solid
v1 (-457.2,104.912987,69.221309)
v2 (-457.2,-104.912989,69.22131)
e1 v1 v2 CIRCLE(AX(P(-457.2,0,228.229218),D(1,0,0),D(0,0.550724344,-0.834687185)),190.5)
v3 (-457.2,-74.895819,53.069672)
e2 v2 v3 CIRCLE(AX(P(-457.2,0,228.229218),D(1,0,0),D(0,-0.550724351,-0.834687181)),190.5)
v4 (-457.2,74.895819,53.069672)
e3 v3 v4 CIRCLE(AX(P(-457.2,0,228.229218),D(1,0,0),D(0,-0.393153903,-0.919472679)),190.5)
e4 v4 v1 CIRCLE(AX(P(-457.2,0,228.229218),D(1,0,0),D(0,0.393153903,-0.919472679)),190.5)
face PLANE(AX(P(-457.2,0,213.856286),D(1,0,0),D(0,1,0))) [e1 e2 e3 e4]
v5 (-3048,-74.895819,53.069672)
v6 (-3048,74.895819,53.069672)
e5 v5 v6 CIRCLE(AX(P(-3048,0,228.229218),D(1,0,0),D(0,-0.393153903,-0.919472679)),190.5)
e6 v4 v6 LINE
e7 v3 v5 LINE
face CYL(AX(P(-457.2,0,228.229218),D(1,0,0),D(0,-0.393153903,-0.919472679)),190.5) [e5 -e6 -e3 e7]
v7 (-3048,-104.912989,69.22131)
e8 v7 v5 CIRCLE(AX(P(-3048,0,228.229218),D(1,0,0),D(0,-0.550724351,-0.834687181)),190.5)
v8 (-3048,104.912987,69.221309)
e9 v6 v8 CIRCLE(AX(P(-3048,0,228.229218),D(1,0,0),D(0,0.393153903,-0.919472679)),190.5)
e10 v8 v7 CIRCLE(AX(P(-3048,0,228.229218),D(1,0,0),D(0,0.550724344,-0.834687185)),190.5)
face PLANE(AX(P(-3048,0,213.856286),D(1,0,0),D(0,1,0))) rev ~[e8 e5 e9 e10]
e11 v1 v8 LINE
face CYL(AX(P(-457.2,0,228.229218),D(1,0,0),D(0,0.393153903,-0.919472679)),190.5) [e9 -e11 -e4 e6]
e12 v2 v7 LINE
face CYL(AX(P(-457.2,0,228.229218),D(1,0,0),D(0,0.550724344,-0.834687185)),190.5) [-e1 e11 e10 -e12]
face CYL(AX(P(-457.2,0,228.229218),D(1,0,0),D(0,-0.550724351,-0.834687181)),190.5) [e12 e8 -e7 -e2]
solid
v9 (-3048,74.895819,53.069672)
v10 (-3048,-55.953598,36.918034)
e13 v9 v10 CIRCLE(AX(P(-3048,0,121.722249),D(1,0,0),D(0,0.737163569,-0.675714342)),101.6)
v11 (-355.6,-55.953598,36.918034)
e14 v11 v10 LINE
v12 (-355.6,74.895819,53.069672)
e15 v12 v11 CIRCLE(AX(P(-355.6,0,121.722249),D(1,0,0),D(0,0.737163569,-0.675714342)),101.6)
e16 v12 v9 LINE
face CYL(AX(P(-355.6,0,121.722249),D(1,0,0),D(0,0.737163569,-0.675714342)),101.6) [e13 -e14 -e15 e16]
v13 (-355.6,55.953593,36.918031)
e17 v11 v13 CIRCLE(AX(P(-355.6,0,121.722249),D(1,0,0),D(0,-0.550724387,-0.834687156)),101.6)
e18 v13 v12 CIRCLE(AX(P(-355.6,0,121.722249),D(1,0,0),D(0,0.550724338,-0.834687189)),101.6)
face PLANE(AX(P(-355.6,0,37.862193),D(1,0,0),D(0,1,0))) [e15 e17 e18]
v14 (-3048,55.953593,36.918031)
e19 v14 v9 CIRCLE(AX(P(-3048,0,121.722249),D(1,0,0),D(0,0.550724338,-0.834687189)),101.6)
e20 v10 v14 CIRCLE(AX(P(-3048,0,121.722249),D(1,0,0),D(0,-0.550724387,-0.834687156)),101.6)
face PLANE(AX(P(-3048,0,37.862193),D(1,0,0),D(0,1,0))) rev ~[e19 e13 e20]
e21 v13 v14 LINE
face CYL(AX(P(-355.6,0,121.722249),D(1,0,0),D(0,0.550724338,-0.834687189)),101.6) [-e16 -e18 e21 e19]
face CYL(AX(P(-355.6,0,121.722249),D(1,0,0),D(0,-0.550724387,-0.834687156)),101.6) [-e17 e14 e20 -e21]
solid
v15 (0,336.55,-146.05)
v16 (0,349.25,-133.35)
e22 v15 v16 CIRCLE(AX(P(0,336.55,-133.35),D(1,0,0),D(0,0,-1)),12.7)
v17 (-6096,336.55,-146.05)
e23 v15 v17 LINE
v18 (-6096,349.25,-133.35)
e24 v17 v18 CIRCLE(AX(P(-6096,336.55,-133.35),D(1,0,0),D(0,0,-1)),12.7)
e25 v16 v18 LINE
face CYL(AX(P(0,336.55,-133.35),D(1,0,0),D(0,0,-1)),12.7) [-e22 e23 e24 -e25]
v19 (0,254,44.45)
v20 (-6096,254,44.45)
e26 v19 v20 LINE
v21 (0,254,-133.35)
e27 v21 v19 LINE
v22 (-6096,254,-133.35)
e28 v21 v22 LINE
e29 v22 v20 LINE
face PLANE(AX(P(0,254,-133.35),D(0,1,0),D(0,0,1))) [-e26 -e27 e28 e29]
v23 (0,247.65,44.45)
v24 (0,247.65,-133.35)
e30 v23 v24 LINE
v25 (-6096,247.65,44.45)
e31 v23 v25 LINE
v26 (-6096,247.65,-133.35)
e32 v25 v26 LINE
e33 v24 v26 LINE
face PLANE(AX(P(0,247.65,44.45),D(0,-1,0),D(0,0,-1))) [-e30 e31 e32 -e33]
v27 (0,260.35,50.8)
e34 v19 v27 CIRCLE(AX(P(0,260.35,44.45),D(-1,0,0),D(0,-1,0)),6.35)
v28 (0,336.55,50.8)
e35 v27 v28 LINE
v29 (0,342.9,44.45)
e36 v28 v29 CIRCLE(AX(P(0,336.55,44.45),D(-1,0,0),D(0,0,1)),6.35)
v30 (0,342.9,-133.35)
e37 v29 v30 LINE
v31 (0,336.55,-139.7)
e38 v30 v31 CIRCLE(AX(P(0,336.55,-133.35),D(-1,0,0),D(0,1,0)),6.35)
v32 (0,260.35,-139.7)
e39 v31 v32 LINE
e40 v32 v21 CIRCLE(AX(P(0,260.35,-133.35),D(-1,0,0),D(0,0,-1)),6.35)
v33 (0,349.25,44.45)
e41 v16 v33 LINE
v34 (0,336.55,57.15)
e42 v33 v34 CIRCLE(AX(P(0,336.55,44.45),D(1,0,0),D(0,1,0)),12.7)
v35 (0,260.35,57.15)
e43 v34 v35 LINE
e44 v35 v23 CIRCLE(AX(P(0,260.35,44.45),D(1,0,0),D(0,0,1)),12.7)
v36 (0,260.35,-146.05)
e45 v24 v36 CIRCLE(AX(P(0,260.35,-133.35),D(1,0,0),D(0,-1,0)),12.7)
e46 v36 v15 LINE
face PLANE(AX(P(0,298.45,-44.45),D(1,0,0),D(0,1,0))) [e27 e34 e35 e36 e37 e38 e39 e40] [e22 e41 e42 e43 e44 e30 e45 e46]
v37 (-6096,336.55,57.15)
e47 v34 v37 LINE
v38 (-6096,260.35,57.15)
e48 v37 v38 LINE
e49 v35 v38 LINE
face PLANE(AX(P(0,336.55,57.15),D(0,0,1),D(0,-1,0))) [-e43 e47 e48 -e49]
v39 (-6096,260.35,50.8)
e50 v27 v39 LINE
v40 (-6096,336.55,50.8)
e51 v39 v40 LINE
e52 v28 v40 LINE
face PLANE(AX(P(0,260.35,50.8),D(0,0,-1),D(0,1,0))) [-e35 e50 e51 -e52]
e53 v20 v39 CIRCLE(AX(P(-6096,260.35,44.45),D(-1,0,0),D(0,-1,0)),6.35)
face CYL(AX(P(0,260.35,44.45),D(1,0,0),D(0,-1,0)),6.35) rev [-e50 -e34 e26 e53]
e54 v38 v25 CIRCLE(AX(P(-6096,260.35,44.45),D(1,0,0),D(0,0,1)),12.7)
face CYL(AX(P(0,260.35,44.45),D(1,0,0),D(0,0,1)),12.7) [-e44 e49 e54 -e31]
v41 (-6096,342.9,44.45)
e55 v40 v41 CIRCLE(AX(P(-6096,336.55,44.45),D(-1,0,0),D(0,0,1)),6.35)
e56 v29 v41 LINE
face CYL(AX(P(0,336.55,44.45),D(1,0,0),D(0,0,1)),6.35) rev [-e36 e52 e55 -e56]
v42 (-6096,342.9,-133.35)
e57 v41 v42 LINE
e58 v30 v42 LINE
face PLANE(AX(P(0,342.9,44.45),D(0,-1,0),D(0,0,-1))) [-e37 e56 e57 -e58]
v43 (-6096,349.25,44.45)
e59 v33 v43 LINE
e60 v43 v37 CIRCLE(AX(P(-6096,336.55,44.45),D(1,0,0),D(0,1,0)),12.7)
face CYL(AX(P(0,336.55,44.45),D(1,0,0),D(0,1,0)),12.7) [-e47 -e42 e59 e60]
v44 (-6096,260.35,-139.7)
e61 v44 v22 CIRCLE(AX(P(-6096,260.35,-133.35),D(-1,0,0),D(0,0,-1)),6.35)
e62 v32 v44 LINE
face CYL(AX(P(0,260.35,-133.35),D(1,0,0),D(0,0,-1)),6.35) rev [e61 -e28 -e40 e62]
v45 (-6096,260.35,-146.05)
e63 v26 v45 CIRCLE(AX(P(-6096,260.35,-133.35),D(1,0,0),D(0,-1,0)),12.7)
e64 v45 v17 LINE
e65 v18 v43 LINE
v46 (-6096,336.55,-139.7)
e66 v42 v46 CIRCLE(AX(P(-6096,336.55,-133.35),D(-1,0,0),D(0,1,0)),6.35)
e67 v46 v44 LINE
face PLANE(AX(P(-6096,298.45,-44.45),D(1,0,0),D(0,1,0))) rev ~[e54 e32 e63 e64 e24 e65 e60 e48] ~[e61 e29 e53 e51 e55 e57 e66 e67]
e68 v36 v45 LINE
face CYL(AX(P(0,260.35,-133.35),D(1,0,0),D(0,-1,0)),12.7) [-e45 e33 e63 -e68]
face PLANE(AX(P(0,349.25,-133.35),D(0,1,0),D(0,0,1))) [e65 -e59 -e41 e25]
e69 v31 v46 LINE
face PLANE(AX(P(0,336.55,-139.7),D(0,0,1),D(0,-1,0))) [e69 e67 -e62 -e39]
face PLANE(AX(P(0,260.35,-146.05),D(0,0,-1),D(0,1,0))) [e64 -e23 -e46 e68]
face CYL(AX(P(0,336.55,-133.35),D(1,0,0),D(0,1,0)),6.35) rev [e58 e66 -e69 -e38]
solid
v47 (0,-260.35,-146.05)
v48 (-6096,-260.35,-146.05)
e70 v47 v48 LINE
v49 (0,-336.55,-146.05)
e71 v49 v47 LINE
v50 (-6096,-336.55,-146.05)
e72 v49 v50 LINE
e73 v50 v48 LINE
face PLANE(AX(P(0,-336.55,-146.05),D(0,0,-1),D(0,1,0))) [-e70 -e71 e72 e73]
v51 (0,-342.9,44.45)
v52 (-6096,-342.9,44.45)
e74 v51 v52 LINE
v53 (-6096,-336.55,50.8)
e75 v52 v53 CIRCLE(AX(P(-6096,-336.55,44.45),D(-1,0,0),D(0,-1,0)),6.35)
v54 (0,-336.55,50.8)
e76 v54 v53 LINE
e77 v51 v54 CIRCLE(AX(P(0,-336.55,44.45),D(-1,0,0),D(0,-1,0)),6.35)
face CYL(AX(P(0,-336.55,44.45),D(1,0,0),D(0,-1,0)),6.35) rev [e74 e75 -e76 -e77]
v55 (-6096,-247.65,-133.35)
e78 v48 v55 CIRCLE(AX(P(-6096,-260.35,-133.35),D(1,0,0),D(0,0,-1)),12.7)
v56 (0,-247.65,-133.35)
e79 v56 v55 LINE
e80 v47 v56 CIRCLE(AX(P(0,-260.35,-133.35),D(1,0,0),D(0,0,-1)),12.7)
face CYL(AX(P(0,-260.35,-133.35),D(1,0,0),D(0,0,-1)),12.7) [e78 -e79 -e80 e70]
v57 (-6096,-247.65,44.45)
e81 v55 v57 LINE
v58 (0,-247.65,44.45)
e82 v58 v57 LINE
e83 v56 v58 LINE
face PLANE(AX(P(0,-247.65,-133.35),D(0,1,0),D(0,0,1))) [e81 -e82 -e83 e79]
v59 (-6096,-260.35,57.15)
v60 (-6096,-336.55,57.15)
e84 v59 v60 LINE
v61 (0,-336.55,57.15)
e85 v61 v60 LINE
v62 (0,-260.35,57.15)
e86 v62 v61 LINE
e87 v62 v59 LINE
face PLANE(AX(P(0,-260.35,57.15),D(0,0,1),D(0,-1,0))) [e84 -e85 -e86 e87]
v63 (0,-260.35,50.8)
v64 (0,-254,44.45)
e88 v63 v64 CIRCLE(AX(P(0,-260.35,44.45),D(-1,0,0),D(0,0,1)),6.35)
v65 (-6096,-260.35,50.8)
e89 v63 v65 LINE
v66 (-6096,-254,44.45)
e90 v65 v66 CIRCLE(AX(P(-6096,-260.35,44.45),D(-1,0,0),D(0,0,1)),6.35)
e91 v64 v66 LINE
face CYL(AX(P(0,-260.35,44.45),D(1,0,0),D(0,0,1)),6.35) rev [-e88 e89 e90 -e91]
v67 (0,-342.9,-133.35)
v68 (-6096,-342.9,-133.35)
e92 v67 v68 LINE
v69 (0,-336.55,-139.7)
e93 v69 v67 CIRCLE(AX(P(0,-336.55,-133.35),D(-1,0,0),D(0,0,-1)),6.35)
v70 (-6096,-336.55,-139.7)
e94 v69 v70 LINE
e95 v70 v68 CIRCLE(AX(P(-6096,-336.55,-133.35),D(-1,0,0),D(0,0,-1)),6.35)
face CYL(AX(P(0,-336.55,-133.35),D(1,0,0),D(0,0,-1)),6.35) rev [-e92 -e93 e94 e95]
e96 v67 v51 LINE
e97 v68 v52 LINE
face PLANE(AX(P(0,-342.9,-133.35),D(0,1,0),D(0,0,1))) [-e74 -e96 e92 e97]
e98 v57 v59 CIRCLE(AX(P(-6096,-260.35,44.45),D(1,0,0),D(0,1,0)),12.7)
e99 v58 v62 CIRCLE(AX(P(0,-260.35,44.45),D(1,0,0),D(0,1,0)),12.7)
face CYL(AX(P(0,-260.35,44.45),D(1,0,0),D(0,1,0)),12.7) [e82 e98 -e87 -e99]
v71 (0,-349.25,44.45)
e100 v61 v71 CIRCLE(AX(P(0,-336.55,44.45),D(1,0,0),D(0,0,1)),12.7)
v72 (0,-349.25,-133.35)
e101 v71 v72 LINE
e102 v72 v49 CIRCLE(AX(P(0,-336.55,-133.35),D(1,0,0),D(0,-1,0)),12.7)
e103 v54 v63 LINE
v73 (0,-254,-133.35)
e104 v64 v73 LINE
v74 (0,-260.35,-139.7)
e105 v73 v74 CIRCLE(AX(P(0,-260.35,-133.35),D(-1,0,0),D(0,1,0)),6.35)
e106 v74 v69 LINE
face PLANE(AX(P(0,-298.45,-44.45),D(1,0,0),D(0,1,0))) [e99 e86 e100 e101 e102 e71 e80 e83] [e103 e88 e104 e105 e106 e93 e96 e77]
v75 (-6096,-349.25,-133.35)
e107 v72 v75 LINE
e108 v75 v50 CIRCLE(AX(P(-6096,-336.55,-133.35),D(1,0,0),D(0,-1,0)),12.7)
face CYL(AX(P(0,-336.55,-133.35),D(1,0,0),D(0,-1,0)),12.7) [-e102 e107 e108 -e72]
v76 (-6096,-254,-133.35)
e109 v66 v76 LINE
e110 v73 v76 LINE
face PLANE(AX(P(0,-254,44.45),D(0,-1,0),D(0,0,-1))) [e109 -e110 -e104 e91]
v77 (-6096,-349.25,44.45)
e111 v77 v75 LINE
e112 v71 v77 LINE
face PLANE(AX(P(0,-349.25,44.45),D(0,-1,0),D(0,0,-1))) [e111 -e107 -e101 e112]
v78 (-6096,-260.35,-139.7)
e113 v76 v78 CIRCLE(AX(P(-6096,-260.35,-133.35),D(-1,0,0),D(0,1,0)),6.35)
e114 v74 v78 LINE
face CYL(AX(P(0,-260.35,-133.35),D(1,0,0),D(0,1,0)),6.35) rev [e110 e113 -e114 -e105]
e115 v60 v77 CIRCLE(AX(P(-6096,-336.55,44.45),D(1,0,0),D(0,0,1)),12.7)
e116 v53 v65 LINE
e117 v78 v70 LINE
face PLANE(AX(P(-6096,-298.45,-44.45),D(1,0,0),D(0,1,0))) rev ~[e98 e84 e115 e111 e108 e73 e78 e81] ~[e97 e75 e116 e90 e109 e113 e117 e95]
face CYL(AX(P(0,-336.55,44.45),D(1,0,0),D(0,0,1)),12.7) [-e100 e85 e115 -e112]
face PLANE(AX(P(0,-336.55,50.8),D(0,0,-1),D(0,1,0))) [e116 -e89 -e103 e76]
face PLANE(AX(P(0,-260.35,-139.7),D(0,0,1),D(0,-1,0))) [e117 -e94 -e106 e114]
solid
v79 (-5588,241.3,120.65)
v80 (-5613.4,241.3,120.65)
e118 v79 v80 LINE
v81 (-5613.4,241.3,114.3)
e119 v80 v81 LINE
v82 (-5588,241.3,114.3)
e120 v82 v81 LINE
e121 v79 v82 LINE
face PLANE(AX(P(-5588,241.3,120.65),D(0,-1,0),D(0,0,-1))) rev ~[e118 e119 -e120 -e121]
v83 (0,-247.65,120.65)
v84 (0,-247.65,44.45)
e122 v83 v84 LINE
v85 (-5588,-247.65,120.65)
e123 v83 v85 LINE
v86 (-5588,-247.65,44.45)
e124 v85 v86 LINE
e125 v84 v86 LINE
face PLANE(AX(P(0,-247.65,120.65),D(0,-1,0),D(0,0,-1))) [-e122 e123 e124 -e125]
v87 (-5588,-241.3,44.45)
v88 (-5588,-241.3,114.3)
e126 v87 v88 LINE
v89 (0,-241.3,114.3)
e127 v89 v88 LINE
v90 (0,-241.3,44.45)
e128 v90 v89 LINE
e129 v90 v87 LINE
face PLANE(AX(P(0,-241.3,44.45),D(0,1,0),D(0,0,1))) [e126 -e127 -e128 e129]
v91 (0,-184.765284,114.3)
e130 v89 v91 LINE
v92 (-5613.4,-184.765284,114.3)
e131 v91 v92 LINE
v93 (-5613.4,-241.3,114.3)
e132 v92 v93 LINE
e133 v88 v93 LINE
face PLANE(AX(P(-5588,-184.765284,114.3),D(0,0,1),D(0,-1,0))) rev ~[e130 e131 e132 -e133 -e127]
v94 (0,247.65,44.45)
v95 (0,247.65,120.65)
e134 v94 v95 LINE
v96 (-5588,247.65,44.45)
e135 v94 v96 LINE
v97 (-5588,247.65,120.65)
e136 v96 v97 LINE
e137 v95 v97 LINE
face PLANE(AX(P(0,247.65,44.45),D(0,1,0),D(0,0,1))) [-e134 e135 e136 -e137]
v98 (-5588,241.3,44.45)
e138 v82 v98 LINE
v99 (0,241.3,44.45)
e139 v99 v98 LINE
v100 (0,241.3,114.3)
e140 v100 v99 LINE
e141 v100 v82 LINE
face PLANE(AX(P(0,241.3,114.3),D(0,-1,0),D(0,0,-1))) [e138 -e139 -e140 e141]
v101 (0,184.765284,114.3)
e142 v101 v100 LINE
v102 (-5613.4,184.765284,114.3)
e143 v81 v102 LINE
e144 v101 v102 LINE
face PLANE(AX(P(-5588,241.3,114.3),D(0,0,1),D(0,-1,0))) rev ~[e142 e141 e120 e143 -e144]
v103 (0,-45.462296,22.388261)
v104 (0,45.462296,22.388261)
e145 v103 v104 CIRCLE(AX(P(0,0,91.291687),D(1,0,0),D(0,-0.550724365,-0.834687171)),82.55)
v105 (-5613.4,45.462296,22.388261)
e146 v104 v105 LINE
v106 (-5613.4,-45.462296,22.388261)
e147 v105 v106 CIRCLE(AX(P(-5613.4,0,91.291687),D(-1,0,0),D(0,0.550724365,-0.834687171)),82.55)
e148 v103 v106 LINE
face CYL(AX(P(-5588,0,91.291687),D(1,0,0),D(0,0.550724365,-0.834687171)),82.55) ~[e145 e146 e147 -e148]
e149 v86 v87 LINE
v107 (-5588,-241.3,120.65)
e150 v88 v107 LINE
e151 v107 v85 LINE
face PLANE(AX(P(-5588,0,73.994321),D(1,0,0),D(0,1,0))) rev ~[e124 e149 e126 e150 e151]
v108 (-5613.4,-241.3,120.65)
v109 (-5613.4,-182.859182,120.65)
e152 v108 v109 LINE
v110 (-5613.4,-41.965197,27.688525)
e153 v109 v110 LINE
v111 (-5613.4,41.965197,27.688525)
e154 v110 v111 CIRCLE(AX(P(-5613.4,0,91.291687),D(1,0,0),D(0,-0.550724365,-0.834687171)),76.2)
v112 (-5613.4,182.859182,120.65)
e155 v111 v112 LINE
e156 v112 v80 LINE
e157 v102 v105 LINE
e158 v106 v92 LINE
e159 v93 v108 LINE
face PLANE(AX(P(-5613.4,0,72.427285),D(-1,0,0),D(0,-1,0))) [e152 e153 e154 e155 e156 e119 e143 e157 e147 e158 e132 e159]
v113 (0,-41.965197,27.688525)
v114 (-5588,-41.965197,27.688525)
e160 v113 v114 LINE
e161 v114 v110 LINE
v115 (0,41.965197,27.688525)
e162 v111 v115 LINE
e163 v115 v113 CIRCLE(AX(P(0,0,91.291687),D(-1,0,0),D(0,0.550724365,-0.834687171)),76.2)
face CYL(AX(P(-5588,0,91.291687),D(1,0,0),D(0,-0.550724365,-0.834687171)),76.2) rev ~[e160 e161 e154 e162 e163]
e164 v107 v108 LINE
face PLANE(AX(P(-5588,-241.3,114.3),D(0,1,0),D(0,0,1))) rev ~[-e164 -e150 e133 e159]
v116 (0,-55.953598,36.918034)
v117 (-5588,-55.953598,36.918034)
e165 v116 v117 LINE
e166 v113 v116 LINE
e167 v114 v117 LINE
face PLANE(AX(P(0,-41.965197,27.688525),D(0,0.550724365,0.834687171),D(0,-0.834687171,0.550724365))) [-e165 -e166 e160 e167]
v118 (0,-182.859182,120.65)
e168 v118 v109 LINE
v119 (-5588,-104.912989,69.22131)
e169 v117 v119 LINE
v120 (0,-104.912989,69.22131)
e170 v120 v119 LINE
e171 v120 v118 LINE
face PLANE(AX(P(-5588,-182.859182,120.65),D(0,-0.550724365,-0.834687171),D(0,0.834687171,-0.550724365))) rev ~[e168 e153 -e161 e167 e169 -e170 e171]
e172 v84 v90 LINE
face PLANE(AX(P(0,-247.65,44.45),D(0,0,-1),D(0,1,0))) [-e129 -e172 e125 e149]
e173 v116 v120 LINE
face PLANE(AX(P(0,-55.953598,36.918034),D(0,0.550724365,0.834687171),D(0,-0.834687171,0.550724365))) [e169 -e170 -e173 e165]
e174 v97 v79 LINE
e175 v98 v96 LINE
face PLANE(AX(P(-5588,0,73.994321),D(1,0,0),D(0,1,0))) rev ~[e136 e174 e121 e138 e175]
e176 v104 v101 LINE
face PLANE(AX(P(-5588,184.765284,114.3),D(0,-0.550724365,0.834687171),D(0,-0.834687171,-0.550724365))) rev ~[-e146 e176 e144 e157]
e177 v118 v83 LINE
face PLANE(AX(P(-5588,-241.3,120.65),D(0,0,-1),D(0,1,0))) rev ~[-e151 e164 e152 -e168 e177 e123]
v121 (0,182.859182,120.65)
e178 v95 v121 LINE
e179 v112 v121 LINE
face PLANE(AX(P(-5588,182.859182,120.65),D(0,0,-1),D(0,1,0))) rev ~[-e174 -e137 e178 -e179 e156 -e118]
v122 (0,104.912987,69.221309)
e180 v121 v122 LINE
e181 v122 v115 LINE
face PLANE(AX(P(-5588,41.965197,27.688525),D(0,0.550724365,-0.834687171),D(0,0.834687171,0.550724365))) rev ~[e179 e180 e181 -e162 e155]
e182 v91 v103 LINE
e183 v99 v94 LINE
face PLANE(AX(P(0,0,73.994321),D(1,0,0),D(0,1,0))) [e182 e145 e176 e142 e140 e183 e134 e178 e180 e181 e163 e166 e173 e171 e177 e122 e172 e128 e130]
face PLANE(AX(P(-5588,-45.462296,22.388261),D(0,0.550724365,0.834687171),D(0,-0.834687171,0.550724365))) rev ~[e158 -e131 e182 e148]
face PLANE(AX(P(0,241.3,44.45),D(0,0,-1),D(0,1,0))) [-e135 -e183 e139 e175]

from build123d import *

# Parameters (mm, degrees)
F1_DEPTH = 6096
F2_DEPTH = 5588
F3_START = -355.6
F3_DEPTH = 2692.4
F4_START = -457.2
F4_DEPTH = 2590.8
F7_DEPTH = 25.4


# Not quite as in the source:
# - a feature names something its author has since deleted; it is built from what else it names


with BuildPart() as f1:
    # F0 (on Right) → F1 (new body)
    with BuildSketch(Plane.YZ):
        with BuildLine():
            Line((-278.751844046, 57.15), (-336.55, 57.15))
            ThreePointArc((-336.55, 57.15), (-345.5302561211, 53.4302561211), (-349.25, 44.45))
            Line((-349.25, 44.45), (-349.25, -133.35))
            ThreePointArc((-349.25, -133.35), (-345.5302561211, -142.3302561211), (-336.55, -146.05))
            Line((-336.55, -146.05), (-260.35, -146.05))
            ThreePointArc((-260.35, -146.05), (-251.3697438789, -142.3302561211), (-247.65, -133.35))
            Line((-247.65, -133.35), (-247.65, 44.45))
            ThreePointArc((-247.65, 44.45), (-251.3697438789, 53.4302561211), (-260.35, 57.15))
            Line((-260.35, 57.15), (-268.1402802436, 57.15))
            Line((-268.1402802436, 57.15), (-269.3472818438, 57.15))
            Line((-269.3472818438, 57.15), (-278.751844046, 57.15))
        make_face()
        with BuildLine():
            ThreePointArc((-342.9, 44.45), (-341.0401280605, 48.9401280605), (-336.55, 50.8))
            Line((-336.55, 50.8), (-260.35, 50.8))
            ThreePointArc((-260.35, 50.8), (-255.8598719395, 48.9401280605), (-254, 44.45))
            Line((-254, 44.45), (-254, -133.35))
            ThreePointArc((-254, -133.35), (-255.8598719395, -137.8401280605), (-260.35, -139.7))
            Line((-260.35, -139.7), (-336.55, -139.7))
            ThreePointArc((-336.55, -139.7), (-341.0401280605, -137.8401280605), (-342.9, -133.35))
            Line((-342.9, -133.35), (-342.9, 44.45))
        make_face(mode=Mode.SUBTRACT)
    extrude(amount=-F1_DEPTH)


with BuildPart() as f1b:
    # F0 (on Right) → F1, piece 2 (new body)
    with BuildSketch(Plane.YZ):
        with BuildLine():
            ThreePointArc((260.35, 57.15), (251.3697438789, 53.4302561211), (247.65, 44.45))
            Line((247.65, 44.45), (247.65, -133.35))
            ThreePointArc((247.65, -133.35), (251.3697438789, -142.3302561211), (260.35, -146.05))
            Line((260.35, -146.05), (336.55, -146.05))
            ThreePointArc((336.55, -146.05), (345.5302561211, -142.3302561211), (349.25, -133.35))
            Line((349.25, -133.35), (349.25, 44.45))
            ThreePointArc((349.25, 44.45), (345.5302561211, 53.4302561211), (336.55, 57.15))
            Line((336.55, 57.15), (260.35, 57.15))
        make_face()
        with BuildLine():
            Line((260.35, 50.8), (336.55, 50.8))
            ThreePointArc((336.55, 50.8), (341.0401280605, 48.9401280605), (342.9, 44.45))
            Line((342.9, 44.45), (342.9, -133.35))
            ThreePointArc((342.9, -133.35), (341.0401280605, -137.8401280605), (336.55, -139.7))
            Line((336.55, -139.7), (260.35, -139.7))
            ThreePointArc((260.35, -139.7), (255.8598719395, -137.8401280605), (254, -133.35))
            Line((254, -133.35), (254, 44.45))
            ThreePointArc((254, 44.45), (255.8598719395, 48.9401280605), (260.35, 50.8))
        make_face(mode=Mode.SUBTRACT)
    extrude(amount=-F1_DEPTH)


with BuildPart() as f2:
    # F0 (on Right) → F2 (new body)
    with BuildSketch(Plane.YZ):
        with BuildLine():
            Line((-247.65, 120.65), (-247.65, 44.45))
            Line((-247.65, 44.45), (-241.3, 44.45))
            Line((-241.3, 44.45), (-241.3, 114.3))
            Line((-241.3, 114.3), (-184.7652837227, 114.3))
            Line((-184.7652837227, 114.3), (-45.4622963682, 22.3882611001))
            ThreePointArc((-45.4622963682, 22.3882611001), (0, 8.7416870594), (45.4622963682, 22.3882611001))
            Line((45.4622963682, 22.3882611001), (184.7652837227, 114.3))
            Line((184.7652837227, 114.3), (241.3, 114.3))
            Line((241.3, 114.3), (241.3, 44.45))
            Line((241.3, 44.45), (247.65, 44.45))
            Line((247.65, 44.45), (247.65, 120.65))
            Line((247.65, 120.65), (182.8591823578, 120.65))
            Line((182.8591823578, 120.65), (104.9129874888, 69.2213088636))
            Line((104.9129874888, 69.2213088636), (55.9535927255, 36.9180309968))
            Line((55.9535927255, 36.9180309968), (41.9651966475, 27.6885246354))
            ThreePointArc((41.9651966475, 27.6885246354), (0, 15.0916870594), (-41.9651966475, 27.6885246354))
            Line((-41.9651966475, 27.6885246354), (-55.9535977541, 36.9180343146))
            Line((-55.9535977541, 36.9180343146), (-104.9129888218, 69.2213097431))
            Line((-104.9129888218, 69.2213097431), (-182.8591823578, 120.65))
            Line((-182.8591823578, 120.65), (-247.65, 120.65))
        make_face()
    extrude(amount=-F2_DEPTH)

    # F6 (on face) → F7 (join)
    with BuildSketch(Plane(origin=(-5588, 0, 0), x_dir=(0, -1, 0), z_dir=(-1, 0, 0))):
        with BuildLine():
            Line((-241.3, 120.65), (-241.3, 114.3))
            Line((-241.3, 114.3), (-184.7652837227, 114.3))
            Line((-184.7652837227, 114.3), (-45.4622963682, 22.3882611001))
            ThreePointArc((-45.4622963682, 22.3882611001), (0, 8.7416870594), (45.4622963682, 22.3882611001))
            Line((45.4622963682, 22.3882611001), (184.7652837227, 114.3))
            Line((184.7652837227, 114.3), (241.3, 114.3))
            Line((241.3, 114.3), (241.3, 120.65))
            Line((241.3, 120.65), (182.8591823578, 120.65))
            Line((182.8591823578, 120.65), (41.9651966475, 27.6885246354))
            ThreePointArc((41.9651966475, 27.6885246354), (0, 15.0916870594), (-41.9651966475, 27.6885246354))
            Line((-41.9651966475, 27.6885246354), (-182.8591823578, 120.65))
            Line((-182.8591823578, 120.65), (-241.3, 120.65))
        make_face()
    extrude(amount=F7_DEPTH)


with BuildPart() as f3:
    # F0 (on Right) → F3 (new body)
    with BuildSketch(Plane.YZ.offset(F3_START)):
        with BuildLine():
            ThreePointArc((-74.8958186051, 53.0696722179), (-65.9212506869, 44.4115211281), (-55.9535977541, 36.9180343146))
            ThreePointArc((-55.9535977541, 36.9180343146), (-3.0123e-06, 20.1222494126), (55.9535927255, 36.9180309968))
            ThreePointArc((55.9535927255, 36.9180309968), (65.9212483948, 44.4115191736), (74.8958186051, 53.0696722179))
            ThreePointArc((74.8958186051, 53.0696722179), (0, 37.7292176485), (-74.8958186051, 53.0696722179))
        make_face()
        with BuildLine():
            ThreePointArc((101.6, 121.7222494126), (-36.8316767859, 216.4111483667), (-74.8958186051, 53.0696722179))
            ThreePointArc((-74.8958186051, 53.0696722179), (0, 37.7292176485), (74.8958186051, 53.0696722179))
            ThreePointArc((74.8958186051, 53.0696722179), (94.6888989541, 84.8905726267), (101.6, 121.7222494126))
        make_face()
    extrude(amount=-F3_DEPTH)


with BuildPart() as f4:
    # F0 (on Right) → F4 (new body)
    with BuildSketch(Plane.YZ.offset(F4_START)):
        with BuildLine():
            ThreePointArc((190.5, 228.2292176485), (-90.2893283546, 395.9733298709), (-104.9129888218, 69.2213097431))
            ThreePointArc((-104.9129888218, 69.2213097431), (-90.2663871868, 60.4727592207), (-74.8958186051, 53.0696722179))
            ThreePointArc((-74.8958186051, 53.0696722179), (-36.8316767859, 216.4111483667), (101.6, 121.7222494126))
            ThreePointArc((101.6, 121.7222494126), (94.6888989541, 84.8905726267), (74.8958186051, 53.0696722179))
            ThreePointArc((74.8958186051, 53.0696722179), (90.2663864837, 60.4727588424), (104.9129874888, 69.2213088636))
            ThreePointArc((104.9129874888, 69.2213088636), (167.7441118439, 137.9398885908), (190.5, 228.2292176485))
        make_face()
        with BuildLine():
            ThreePointArc((101.6, 121.7222494126), (-36.8316767859, 216.4111483667), (-74.8958186051, 53.0696722179))
            ThreePointArc((-74.8958186051, 53.0696722179), (0, 37.7292176485), (74.8958186051, 53.0696722179))
            ThreePointArc((74.8958186051, 53.0696722179), (94.6888989541, 84.8905726267), (101.6, 121.7222494126))
        make_face()
    extrude(amount=-F4_DEPTH)


solid = Compound([f1.part, f1b.part, f2.part, f3.part, f4.part])
